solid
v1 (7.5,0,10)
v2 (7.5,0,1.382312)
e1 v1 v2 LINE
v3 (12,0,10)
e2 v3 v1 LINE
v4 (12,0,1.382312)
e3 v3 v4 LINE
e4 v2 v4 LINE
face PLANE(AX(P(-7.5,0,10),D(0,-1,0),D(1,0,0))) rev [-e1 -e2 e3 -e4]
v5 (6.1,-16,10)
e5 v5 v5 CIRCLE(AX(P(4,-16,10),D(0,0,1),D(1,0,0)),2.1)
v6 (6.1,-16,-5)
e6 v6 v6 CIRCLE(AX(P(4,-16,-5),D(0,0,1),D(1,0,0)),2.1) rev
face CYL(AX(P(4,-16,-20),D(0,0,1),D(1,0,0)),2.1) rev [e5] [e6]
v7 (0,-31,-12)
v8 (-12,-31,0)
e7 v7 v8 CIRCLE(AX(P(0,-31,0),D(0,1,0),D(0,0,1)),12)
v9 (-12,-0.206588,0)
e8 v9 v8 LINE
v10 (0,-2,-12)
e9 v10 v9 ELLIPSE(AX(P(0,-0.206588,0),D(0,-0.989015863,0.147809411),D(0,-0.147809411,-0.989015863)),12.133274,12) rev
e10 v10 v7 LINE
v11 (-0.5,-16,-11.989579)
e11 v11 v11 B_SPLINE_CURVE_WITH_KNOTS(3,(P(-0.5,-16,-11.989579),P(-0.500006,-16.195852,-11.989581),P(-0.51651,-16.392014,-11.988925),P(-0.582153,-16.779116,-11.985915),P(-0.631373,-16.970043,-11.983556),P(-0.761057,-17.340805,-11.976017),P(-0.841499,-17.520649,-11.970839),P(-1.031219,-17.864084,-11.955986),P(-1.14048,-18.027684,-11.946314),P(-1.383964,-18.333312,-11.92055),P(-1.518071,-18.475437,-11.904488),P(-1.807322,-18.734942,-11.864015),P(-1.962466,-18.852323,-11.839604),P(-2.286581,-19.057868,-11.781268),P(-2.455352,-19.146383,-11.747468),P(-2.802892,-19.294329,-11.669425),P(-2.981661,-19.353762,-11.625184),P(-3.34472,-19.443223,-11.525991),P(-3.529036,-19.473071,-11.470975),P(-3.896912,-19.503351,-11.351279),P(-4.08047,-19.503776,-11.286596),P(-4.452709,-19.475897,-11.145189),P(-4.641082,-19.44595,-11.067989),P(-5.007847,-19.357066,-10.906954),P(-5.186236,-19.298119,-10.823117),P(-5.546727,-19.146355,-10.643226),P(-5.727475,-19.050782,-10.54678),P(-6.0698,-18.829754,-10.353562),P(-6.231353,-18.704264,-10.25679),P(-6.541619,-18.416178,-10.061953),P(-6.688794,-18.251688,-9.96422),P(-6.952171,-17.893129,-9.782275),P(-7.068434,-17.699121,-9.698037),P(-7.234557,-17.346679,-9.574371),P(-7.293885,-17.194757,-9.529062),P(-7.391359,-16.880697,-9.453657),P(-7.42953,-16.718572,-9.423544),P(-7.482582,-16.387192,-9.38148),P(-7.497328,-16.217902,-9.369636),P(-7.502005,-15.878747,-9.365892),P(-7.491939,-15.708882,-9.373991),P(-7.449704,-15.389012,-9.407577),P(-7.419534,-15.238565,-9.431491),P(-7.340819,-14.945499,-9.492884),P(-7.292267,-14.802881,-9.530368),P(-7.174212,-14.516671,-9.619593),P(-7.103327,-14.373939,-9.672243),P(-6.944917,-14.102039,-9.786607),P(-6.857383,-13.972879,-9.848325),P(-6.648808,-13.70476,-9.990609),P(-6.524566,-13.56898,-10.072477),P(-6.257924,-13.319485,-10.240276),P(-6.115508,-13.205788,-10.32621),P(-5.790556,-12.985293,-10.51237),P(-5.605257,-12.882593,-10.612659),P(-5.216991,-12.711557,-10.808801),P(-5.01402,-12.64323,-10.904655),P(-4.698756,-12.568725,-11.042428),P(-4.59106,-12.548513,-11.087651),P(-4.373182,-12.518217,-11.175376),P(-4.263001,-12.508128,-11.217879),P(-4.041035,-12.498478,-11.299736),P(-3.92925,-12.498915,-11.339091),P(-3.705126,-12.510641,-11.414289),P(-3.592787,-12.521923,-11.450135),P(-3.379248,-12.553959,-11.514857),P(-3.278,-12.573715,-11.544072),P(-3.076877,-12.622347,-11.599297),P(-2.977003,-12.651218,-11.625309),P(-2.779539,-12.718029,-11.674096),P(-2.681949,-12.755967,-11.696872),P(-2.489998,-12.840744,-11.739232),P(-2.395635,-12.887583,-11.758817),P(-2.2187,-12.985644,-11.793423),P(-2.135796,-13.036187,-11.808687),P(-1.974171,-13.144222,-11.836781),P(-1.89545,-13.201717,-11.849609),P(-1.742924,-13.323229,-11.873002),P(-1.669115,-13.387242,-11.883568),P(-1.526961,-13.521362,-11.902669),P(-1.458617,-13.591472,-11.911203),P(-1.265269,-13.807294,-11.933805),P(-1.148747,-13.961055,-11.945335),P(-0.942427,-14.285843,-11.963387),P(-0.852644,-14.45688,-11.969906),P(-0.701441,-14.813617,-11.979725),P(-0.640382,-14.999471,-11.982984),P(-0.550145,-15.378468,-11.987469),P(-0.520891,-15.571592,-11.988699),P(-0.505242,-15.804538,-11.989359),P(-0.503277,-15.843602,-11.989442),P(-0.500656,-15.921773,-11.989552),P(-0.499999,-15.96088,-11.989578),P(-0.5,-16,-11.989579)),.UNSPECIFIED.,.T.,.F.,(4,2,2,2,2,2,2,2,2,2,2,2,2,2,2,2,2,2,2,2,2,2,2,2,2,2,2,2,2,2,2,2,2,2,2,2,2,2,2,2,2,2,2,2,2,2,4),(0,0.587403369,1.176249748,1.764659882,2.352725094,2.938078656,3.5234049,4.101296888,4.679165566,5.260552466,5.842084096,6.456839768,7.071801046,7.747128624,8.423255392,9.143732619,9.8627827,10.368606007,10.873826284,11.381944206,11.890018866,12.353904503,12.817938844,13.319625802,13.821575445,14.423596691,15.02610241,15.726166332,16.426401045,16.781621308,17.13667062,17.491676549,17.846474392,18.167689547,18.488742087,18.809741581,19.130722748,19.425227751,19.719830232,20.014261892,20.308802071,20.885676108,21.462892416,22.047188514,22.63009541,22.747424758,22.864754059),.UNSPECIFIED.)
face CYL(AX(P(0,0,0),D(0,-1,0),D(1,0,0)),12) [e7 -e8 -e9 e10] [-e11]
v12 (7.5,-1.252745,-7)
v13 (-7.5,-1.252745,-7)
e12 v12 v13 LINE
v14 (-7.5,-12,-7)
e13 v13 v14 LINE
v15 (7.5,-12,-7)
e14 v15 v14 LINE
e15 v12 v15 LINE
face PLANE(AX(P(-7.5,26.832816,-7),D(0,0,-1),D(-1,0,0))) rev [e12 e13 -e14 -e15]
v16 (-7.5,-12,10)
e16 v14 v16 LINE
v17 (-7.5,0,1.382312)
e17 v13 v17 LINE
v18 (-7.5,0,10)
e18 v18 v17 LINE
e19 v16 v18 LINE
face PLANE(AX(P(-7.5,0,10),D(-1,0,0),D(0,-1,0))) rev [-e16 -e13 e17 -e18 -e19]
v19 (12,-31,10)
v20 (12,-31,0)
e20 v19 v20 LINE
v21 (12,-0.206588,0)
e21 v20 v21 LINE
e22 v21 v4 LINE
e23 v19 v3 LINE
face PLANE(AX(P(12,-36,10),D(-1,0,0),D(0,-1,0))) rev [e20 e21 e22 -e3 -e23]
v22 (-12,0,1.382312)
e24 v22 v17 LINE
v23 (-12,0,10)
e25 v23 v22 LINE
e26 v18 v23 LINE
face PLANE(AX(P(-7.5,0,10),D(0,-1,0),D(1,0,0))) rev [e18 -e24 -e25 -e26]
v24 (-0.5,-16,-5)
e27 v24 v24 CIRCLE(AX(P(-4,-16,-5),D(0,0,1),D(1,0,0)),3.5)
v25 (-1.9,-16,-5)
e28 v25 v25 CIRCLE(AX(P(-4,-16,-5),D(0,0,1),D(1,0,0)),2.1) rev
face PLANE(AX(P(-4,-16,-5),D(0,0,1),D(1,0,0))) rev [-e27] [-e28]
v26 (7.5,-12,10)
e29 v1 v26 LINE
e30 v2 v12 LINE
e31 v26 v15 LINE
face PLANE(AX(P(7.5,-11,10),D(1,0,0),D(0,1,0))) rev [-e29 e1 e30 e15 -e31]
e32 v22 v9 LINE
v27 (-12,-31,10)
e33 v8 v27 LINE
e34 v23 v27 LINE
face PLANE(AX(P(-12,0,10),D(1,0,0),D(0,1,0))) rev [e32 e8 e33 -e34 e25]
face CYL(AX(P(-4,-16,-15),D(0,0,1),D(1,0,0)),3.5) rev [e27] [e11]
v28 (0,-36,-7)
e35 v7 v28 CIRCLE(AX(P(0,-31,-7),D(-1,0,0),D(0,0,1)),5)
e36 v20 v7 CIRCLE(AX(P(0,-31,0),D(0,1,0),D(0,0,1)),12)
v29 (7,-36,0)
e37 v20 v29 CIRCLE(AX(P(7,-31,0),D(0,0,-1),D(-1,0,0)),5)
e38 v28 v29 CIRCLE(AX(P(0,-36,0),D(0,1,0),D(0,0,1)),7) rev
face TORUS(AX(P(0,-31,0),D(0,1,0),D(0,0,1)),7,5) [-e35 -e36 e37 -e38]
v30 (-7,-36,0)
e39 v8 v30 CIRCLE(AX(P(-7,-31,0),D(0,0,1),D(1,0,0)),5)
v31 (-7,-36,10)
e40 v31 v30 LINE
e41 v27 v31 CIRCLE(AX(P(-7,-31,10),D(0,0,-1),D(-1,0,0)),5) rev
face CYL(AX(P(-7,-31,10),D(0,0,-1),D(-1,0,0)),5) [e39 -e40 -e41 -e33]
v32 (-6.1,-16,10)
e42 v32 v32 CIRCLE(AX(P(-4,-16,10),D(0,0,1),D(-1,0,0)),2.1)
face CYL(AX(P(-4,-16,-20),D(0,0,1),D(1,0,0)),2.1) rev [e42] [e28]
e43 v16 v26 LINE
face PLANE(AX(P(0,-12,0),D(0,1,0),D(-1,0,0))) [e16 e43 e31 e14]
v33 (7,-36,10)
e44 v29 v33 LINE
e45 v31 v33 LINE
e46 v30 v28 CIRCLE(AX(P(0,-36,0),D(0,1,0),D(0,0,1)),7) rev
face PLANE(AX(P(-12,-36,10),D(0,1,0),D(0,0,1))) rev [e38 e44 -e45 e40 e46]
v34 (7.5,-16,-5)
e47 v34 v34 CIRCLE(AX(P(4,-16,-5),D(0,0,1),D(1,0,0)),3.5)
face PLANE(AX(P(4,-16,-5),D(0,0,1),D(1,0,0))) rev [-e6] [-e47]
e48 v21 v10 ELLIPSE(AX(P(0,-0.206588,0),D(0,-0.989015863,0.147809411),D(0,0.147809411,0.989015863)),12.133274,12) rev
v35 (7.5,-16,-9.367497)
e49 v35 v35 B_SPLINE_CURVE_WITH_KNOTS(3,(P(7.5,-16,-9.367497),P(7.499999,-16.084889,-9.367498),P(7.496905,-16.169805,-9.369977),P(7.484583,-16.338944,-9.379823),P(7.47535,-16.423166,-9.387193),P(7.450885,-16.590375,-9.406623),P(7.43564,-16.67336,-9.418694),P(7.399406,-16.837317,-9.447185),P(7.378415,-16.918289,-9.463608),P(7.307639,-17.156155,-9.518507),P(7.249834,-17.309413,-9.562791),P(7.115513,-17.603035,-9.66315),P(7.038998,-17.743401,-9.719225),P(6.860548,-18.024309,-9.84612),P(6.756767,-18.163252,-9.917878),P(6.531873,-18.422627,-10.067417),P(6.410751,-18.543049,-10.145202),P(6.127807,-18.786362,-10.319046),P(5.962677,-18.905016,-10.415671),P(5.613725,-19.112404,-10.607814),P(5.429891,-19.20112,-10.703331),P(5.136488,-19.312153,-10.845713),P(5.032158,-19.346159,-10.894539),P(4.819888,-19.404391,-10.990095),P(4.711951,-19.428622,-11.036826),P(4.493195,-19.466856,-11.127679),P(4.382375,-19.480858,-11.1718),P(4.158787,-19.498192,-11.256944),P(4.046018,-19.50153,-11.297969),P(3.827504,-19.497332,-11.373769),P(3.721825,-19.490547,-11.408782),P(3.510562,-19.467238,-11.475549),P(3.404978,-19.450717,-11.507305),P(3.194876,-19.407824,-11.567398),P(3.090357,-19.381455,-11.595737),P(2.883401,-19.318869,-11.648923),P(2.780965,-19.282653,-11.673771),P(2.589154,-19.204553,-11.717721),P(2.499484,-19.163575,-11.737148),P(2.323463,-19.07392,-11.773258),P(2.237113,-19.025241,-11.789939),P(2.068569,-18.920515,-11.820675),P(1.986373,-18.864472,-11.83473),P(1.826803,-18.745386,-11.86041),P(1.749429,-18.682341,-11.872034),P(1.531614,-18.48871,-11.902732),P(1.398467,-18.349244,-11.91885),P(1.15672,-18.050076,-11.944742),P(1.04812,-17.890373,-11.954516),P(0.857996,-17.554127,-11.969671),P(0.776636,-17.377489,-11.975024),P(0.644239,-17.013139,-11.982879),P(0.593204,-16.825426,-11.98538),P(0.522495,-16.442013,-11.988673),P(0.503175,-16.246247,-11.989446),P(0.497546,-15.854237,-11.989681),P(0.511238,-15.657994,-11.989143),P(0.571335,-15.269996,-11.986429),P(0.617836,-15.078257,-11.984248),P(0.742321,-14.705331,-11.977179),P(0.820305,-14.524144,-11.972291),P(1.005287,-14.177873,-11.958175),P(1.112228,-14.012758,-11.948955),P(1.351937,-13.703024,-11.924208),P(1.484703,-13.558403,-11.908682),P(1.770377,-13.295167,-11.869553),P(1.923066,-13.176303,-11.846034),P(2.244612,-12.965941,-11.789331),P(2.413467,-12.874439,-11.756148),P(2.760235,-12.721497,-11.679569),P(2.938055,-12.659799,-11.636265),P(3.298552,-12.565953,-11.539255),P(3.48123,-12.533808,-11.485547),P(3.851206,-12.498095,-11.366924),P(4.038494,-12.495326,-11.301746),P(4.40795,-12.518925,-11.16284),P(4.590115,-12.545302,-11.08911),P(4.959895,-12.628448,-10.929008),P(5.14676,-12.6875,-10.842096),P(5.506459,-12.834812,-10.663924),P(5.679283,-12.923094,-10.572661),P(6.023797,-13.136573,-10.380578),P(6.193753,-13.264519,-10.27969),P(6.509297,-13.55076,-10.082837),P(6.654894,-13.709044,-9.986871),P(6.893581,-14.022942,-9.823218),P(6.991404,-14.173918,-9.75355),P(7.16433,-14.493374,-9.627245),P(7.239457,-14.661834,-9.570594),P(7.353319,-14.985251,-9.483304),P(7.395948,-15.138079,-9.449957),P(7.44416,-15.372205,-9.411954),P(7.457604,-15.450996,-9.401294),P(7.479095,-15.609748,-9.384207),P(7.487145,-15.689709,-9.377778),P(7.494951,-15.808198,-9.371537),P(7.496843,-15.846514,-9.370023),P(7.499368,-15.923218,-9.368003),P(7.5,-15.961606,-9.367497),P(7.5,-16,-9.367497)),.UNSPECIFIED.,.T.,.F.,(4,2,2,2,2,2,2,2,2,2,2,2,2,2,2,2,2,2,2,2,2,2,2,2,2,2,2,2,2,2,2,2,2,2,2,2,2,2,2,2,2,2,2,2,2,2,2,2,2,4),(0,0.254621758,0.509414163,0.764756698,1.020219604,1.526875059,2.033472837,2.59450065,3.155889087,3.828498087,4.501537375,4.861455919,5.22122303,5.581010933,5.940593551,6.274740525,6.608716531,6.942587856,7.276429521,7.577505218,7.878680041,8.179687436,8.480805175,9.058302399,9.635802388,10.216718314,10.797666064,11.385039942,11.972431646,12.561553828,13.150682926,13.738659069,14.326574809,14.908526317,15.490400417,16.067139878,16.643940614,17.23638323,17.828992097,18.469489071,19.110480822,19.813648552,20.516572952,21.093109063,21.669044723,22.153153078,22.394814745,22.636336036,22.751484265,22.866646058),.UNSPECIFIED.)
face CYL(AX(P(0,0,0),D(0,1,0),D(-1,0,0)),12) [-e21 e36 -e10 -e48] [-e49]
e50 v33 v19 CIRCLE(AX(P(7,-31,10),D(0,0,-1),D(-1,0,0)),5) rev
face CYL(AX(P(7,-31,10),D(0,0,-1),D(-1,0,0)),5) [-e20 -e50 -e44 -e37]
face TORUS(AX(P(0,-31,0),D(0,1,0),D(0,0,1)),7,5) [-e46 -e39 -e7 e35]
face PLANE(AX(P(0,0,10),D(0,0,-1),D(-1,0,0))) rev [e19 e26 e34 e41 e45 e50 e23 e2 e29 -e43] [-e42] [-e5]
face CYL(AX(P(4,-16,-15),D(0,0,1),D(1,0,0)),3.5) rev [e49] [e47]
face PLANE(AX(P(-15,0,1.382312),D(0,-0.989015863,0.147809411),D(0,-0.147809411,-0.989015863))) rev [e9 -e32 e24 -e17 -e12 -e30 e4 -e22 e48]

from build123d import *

# Parameters (mm, degrees)
EXTRUDE_1_DEPTH     = 10
SKETCH_2_W          = 24
SKETCH_2_H          = 25
EXTRUDE_2_DEPTH     = 12
EXTRUDE_3_DEPTH     = 11
CUT_EXTRUDE_1_DEPTH = 15
SKETCH_5_W          = 15
SKETCH_5_H          = 17
CUT_EXTRUDE_2_DEPTH = 1
FILLET_2_R          = 12
FILLET_3_R          = 5
SKETCH_6_R          = 2.1
CUT_EXTRUDE_3_DEPTH = 30
CUT_EXTRUDE_START   = -15
SKETCH_7_R          = 3.5
CUT_EXTRUDE_4_DEPTH = 10


with BuildPart() as part:
    # 草图1 → 凸台-拉伸1 (new body)
    with BuildSketch(Plane.XY):
        Polygon((-7.5, 0), (-12, 0), (-12, -36), (12, -36), (12, 0), (7.5, 0), (7.5, -11), (-7.5, -11), align=None)
    extrude(amount=EXTRUDE_1_DEPTH)

    # 草图2 → 凸台-拉伸2 (add)
    with BuildSketch(Plane(origin=(0, 0, 0), x_dir=(-1, 0, 0), z_dir=(0, 0, -1))):
        with Locations((0, -23.5)):
            Rectangle(SKETCH_2_W, SKETCH_2_H)
    extrude(amount=EXTRUDE_2_DEPTH)

    # 草图3 → 凸台-拉伸3 (add)
    with BuildSketch(Plane(origin=(0, -11, 0), x_dir=(1, 0, 0), z_dir=(0, 1, 0))):
        Polygon((-7.5, 0), (-7.5, 7), (7.5, 7), (7.5, 0), (12, 0), (12, 12), (-12, 12), (-12, 0), align=None)
    extrude(amount=EXTRUDE_3_DEPTH)

    # 草图4 → 切除-拉伸1 (cut, symmetric)
    with BuildSketch(Plane(origin=(0, 0, 0), x_dir=(0, 0, -1), z_dir=(1, 0, 0))):
        Polygon((-1.382312477, 0), (12, -2), (12, 0), align=None)
    extrude(amount=CUT_EXTRUDE_1_DEPTH, both=True, mode=Mode.SUBTRACT)

    # 草图5 → 切除-拉伸2 (cut)
    with BuildSketch(Plane(origin=(0, -11, 0), x_dir=(1, 0, 0), z_dir=(0, 1, 0))):
        with Locations((0, -1.5)):
            Rectangle(SKETCH_5_W, SKETCH_5_H)
    extrude(amount=-CUT_EXTRUDE_2_DEPTH, mode=Mode.SUBTRACT)

    # 圆角2
    fillet_2_edges = [part.edges().sort_by_distance(p)[0] for p in [
        (12, -19, -12),
        (-12, -19, -12),
    ]]
    fillet(fillet_2_edges, radius=FILLET_2_R - 0.0001)  # a hair under: the kernel refuses the full size

    # 圆角3
    fillet_3_edges = [part.edges().sort_by_distance(p)[0] for p in [
        (8.485310664, -36, -8.485310664),
        (-8.485310664, -36, -8.485310664),
        (12, -36, 4.99995),
        (-12, -36, 4.99995),
    ]]
    fillet(fillet_3_edges, radius=FILLET_3_R)

    # 草图6 → 切除-拉伸3 (cut)
    with BuildSketch(Plane.XY.offset(10)):
        with Locations((4, -16)):
            Circle(SKETCH_6_R)
        with Locations((-4, -16)):
            Circle(SKETCH_6_R)
    extrude(amount=-CUT_EXTRUDE_3_DEPTH, mode=Mode.SUBTRACT)

    # 草图7 → 切除-拉伸4 (cut)
    with BuildSketch(Plane.XY.offset(10).offset(CUT_EXTRUDE_START)):
        with Locations((4, -16)):
            Circle(SKETCH_7_R)
        with Locations((-4, -16)):
            Circle(SKETCH_7_R)
    extrude(amount=-CUT_EXTRUDE_4_DEPTH, mode=Mode.SUBTRACT)


solid = part.part
